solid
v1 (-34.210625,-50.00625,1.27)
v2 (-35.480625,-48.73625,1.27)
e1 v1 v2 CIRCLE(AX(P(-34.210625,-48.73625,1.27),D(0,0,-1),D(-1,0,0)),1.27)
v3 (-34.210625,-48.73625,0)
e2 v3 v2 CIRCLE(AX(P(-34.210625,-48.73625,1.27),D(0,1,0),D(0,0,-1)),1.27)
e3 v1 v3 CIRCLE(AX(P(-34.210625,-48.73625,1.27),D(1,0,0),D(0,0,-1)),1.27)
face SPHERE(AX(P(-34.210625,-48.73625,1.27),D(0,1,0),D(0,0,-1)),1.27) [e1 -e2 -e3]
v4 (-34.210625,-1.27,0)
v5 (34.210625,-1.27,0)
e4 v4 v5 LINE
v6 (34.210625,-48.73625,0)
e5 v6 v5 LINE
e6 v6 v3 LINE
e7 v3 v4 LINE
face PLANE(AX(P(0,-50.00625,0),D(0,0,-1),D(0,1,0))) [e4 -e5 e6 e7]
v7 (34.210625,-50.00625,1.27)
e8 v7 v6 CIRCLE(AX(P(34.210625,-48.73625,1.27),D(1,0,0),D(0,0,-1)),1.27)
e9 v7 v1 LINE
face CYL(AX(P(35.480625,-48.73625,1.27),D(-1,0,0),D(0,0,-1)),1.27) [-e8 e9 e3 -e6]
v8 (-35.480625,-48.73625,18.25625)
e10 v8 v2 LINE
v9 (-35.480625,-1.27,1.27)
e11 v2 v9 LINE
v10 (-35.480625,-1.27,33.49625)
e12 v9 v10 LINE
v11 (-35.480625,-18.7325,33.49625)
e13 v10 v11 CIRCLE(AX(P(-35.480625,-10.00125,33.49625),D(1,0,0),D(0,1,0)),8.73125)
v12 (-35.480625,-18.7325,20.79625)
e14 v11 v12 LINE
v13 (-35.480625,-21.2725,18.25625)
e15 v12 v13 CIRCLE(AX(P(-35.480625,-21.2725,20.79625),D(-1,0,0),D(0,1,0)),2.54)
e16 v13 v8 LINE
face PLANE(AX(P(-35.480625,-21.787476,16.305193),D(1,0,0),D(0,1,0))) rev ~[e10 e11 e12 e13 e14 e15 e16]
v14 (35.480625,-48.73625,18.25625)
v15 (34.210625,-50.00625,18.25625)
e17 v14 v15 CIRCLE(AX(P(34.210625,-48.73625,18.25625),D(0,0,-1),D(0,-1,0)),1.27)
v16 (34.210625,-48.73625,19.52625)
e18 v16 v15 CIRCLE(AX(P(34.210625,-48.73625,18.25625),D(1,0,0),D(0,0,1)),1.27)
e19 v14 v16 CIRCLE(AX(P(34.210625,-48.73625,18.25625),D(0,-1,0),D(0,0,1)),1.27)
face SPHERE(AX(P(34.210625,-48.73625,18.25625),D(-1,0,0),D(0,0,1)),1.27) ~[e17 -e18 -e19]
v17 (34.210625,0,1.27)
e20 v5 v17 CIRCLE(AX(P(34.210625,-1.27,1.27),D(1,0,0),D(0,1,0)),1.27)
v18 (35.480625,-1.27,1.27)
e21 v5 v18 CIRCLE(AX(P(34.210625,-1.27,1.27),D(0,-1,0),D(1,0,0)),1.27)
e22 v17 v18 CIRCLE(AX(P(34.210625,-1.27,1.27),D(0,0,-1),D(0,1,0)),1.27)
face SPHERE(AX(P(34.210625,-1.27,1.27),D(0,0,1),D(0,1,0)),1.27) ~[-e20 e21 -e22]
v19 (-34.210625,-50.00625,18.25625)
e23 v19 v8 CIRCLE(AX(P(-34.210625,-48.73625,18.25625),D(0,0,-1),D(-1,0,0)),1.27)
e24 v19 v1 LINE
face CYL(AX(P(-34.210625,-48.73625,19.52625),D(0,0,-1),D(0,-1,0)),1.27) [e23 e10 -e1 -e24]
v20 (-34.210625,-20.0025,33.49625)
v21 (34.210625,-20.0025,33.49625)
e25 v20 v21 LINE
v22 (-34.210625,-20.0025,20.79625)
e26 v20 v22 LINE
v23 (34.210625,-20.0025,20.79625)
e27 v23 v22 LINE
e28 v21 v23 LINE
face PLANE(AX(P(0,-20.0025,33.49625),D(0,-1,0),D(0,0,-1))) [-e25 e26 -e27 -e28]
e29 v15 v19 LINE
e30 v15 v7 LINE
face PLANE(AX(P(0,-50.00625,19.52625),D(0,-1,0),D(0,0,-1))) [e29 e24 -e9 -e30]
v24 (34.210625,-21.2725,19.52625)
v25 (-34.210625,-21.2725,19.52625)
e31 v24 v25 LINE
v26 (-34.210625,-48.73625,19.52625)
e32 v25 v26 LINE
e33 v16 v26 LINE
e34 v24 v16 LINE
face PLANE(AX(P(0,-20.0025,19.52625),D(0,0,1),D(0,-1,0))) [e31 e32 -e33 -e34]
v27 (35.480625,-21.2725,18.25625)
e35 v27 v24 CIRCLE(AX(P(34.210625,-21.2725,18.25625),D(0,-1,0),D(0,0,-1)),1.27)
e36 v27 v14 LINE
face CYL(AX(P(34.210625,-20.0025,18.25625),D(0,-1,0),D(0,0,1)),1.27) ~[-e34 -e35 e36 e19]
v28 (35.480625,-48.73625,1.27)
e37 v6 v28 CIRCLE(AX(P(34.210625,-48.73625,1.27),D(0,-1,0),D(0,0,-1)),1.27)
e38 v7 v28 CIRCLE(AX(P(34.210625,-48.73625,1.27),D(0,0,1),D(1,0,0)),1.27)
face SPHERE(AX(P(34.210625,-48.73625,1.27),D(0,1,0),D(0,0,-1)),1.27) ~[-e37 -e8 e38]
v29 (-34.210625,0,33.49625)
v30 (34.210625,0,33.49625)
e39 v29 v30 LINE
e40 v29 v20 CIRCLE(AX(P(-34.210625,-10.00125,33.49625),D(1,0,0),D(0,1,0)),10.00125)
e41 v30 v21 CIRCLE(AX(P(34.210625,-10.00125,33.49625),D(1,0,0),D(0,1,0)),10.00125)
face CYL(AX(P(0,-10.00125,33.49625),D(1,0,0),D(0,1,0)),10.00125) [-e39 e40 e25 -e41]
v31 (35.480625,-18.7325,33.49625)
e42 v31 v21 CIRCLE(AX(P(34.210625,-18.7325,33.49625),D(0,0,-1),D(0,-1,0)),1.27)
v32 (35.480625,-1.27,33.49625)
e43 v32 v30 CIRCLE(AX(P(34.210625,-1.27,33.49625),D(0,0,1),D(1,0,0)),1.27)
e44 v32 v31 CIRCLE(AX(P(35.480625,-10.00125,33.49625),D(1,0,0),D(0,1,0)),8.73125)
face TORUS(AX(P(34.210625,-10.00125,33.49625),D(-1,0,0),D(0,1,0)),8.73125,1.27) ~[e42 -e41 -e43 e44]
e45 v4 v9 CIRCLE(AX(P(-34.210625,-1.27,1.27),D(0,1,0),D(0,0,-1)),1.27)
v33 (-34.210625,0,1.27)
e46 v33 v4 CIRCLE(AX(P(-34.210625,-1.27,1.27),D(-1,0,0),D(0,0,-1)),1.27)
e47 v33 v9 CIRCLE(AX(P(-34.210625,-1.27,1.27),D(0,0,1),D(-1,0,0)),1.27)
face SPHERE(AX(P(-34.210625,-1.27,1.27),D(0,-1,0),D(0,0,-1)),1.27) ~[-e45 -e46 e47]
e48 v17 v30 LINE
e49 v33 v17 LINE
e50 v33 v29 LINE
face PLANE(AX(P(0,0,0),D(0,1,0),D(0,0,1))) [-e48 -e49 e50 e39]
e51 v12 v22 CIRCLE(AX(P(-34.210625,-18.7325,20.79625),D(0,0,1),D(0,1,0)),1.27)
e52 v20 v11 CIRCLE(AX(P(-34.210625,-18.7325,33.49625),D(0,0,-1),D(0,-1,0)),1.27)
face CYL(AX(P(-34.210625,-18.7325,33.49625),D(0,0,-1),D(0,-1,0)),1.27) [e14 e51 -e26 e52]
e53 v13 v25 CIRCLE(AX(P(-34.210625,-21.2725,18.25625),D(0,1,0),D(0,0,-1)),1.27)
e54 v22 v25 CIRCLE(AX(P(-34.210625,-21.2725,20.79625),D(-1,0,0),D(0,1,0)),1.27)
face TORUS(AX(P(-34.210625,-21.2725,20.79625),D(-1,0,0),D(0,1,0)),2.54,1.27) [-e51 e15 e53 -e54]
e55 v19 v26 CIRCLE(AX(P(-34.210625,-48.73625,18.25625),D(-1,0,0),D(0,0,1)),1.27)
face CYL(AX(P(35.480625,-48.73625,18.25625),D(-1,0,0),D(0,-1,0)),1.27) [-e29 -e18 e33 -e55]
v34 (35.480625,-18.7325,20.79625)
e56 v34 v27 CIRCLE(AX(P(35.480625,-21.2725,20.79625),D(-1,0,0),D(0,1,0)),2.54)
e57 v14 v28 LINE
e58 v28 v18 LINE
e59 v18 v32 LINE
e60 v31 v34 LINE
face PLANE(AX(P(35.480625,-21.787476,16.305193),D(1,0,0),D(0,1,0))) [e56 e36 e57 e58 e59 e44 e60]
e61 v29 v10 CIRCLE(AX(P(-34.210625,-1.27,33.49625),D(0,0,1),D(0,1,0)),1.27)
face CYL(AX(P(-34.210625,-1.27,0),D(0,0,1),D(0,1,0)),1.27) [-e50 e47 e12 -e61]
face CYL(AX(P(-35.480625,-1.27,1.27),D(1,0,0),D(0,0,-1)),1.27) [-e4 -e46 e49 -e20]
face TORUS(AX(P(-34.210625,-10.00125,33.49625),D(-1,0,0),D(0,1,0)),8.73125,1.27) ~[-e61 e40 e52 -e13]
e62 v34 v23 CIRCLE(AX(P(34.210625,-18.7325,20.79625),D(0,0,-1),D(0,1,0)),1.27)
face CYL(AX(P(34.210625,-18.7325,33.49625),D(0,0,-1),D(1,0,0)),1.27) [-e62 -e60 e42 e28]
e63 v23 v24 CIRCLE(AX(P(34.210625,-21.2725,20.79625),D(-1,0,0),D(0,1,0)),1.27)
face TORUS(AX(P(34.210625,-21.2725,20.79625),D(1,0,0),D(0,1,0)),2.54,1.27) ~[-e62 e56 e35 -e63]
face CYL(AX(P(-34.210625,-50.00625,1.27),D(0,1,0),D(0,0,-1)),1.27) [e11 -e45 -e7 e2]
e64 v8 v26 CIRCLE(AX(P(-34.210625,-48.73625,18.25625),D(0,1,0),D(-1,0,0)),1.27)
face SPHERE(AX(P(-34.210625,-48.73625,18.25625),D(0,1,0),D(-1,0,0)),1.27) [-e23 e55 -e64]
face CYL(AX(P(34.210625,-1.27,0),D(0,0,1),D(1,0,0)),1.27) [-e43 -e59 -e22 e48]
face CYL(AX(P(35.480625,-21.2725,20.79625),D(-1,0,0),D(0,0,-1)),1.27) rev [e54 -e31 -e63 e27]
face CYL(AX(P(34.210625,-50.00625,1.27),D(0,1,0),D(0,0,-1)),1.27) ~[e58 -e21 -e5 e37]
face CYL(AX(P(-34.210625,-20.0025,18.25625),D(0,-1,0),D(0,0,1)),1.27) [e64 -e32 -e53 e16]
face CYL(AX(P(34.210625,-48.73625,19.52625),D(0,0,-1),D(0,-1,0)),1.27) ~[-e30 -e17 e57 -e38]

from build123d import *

# Parameters (mm, degrees)
F1_DEPTH = 709.6125
F2_R     = 25.4
F3_SCALE = 0.05


with BuildPart() as f1:
    # F0 (on Right) → F1 (new body, symmetric)
    with BuildSketch(Plane.YZ):
        with BuildLine():
            Line((-1000.125, 0), (0, 0))
            Line((0, 0), (0, 669.925))
            ThreePointArc((0, 669.925), (-200.025, 869.95), (-400.05, 669.925))
            Line((-400.05, 669.925), (-400.05, 390.525))
            Line((-400.05, 390.525), (-1000.125, 390.525))
            Line((-1000.125, 390.525), (-1000.125, 0))
        make_face()
    extrude(amount=F1_DEPTH, both=True)

    # F2
    f2_edges = [f1.edges().sort_by_distance(p)[0] for p in [
        (709.6125, 0, 334.9625),
        (-709.6125, -500.0625, 0),
        (0, 0, 0),
        (709.6125, -500.0625, 0),
        (0, -1000.125, 0),
        (-709.6125, 0, 334.9625),
        (-709.6125, -200.025, 869.95),
        (-709.6125, -400.05, 530.225),
        (-709.6125, -700.0875, 390.525),
        (-709.6125, -1000.125, 195.2625),
        (0, -1000.125, 390.525),
        (709.6125, -200.025, 869.95),
        (709.6125, -400.05, 530.225),
        (709.6125, -700.0875, 390.525),
        (709.6125, -1000.125, 195.2625),
        (0, -400.05, 390.525),
        (0, -400.05, 669.925),
        (0, 0, 669.925),
    ]]
    fillet(f2_edges, radius=F2_R)


with BuildPart() as f1_1:
    # F3: moved
    add(f1.part.scale(F3_SCALE))


solid = f1_1.part
